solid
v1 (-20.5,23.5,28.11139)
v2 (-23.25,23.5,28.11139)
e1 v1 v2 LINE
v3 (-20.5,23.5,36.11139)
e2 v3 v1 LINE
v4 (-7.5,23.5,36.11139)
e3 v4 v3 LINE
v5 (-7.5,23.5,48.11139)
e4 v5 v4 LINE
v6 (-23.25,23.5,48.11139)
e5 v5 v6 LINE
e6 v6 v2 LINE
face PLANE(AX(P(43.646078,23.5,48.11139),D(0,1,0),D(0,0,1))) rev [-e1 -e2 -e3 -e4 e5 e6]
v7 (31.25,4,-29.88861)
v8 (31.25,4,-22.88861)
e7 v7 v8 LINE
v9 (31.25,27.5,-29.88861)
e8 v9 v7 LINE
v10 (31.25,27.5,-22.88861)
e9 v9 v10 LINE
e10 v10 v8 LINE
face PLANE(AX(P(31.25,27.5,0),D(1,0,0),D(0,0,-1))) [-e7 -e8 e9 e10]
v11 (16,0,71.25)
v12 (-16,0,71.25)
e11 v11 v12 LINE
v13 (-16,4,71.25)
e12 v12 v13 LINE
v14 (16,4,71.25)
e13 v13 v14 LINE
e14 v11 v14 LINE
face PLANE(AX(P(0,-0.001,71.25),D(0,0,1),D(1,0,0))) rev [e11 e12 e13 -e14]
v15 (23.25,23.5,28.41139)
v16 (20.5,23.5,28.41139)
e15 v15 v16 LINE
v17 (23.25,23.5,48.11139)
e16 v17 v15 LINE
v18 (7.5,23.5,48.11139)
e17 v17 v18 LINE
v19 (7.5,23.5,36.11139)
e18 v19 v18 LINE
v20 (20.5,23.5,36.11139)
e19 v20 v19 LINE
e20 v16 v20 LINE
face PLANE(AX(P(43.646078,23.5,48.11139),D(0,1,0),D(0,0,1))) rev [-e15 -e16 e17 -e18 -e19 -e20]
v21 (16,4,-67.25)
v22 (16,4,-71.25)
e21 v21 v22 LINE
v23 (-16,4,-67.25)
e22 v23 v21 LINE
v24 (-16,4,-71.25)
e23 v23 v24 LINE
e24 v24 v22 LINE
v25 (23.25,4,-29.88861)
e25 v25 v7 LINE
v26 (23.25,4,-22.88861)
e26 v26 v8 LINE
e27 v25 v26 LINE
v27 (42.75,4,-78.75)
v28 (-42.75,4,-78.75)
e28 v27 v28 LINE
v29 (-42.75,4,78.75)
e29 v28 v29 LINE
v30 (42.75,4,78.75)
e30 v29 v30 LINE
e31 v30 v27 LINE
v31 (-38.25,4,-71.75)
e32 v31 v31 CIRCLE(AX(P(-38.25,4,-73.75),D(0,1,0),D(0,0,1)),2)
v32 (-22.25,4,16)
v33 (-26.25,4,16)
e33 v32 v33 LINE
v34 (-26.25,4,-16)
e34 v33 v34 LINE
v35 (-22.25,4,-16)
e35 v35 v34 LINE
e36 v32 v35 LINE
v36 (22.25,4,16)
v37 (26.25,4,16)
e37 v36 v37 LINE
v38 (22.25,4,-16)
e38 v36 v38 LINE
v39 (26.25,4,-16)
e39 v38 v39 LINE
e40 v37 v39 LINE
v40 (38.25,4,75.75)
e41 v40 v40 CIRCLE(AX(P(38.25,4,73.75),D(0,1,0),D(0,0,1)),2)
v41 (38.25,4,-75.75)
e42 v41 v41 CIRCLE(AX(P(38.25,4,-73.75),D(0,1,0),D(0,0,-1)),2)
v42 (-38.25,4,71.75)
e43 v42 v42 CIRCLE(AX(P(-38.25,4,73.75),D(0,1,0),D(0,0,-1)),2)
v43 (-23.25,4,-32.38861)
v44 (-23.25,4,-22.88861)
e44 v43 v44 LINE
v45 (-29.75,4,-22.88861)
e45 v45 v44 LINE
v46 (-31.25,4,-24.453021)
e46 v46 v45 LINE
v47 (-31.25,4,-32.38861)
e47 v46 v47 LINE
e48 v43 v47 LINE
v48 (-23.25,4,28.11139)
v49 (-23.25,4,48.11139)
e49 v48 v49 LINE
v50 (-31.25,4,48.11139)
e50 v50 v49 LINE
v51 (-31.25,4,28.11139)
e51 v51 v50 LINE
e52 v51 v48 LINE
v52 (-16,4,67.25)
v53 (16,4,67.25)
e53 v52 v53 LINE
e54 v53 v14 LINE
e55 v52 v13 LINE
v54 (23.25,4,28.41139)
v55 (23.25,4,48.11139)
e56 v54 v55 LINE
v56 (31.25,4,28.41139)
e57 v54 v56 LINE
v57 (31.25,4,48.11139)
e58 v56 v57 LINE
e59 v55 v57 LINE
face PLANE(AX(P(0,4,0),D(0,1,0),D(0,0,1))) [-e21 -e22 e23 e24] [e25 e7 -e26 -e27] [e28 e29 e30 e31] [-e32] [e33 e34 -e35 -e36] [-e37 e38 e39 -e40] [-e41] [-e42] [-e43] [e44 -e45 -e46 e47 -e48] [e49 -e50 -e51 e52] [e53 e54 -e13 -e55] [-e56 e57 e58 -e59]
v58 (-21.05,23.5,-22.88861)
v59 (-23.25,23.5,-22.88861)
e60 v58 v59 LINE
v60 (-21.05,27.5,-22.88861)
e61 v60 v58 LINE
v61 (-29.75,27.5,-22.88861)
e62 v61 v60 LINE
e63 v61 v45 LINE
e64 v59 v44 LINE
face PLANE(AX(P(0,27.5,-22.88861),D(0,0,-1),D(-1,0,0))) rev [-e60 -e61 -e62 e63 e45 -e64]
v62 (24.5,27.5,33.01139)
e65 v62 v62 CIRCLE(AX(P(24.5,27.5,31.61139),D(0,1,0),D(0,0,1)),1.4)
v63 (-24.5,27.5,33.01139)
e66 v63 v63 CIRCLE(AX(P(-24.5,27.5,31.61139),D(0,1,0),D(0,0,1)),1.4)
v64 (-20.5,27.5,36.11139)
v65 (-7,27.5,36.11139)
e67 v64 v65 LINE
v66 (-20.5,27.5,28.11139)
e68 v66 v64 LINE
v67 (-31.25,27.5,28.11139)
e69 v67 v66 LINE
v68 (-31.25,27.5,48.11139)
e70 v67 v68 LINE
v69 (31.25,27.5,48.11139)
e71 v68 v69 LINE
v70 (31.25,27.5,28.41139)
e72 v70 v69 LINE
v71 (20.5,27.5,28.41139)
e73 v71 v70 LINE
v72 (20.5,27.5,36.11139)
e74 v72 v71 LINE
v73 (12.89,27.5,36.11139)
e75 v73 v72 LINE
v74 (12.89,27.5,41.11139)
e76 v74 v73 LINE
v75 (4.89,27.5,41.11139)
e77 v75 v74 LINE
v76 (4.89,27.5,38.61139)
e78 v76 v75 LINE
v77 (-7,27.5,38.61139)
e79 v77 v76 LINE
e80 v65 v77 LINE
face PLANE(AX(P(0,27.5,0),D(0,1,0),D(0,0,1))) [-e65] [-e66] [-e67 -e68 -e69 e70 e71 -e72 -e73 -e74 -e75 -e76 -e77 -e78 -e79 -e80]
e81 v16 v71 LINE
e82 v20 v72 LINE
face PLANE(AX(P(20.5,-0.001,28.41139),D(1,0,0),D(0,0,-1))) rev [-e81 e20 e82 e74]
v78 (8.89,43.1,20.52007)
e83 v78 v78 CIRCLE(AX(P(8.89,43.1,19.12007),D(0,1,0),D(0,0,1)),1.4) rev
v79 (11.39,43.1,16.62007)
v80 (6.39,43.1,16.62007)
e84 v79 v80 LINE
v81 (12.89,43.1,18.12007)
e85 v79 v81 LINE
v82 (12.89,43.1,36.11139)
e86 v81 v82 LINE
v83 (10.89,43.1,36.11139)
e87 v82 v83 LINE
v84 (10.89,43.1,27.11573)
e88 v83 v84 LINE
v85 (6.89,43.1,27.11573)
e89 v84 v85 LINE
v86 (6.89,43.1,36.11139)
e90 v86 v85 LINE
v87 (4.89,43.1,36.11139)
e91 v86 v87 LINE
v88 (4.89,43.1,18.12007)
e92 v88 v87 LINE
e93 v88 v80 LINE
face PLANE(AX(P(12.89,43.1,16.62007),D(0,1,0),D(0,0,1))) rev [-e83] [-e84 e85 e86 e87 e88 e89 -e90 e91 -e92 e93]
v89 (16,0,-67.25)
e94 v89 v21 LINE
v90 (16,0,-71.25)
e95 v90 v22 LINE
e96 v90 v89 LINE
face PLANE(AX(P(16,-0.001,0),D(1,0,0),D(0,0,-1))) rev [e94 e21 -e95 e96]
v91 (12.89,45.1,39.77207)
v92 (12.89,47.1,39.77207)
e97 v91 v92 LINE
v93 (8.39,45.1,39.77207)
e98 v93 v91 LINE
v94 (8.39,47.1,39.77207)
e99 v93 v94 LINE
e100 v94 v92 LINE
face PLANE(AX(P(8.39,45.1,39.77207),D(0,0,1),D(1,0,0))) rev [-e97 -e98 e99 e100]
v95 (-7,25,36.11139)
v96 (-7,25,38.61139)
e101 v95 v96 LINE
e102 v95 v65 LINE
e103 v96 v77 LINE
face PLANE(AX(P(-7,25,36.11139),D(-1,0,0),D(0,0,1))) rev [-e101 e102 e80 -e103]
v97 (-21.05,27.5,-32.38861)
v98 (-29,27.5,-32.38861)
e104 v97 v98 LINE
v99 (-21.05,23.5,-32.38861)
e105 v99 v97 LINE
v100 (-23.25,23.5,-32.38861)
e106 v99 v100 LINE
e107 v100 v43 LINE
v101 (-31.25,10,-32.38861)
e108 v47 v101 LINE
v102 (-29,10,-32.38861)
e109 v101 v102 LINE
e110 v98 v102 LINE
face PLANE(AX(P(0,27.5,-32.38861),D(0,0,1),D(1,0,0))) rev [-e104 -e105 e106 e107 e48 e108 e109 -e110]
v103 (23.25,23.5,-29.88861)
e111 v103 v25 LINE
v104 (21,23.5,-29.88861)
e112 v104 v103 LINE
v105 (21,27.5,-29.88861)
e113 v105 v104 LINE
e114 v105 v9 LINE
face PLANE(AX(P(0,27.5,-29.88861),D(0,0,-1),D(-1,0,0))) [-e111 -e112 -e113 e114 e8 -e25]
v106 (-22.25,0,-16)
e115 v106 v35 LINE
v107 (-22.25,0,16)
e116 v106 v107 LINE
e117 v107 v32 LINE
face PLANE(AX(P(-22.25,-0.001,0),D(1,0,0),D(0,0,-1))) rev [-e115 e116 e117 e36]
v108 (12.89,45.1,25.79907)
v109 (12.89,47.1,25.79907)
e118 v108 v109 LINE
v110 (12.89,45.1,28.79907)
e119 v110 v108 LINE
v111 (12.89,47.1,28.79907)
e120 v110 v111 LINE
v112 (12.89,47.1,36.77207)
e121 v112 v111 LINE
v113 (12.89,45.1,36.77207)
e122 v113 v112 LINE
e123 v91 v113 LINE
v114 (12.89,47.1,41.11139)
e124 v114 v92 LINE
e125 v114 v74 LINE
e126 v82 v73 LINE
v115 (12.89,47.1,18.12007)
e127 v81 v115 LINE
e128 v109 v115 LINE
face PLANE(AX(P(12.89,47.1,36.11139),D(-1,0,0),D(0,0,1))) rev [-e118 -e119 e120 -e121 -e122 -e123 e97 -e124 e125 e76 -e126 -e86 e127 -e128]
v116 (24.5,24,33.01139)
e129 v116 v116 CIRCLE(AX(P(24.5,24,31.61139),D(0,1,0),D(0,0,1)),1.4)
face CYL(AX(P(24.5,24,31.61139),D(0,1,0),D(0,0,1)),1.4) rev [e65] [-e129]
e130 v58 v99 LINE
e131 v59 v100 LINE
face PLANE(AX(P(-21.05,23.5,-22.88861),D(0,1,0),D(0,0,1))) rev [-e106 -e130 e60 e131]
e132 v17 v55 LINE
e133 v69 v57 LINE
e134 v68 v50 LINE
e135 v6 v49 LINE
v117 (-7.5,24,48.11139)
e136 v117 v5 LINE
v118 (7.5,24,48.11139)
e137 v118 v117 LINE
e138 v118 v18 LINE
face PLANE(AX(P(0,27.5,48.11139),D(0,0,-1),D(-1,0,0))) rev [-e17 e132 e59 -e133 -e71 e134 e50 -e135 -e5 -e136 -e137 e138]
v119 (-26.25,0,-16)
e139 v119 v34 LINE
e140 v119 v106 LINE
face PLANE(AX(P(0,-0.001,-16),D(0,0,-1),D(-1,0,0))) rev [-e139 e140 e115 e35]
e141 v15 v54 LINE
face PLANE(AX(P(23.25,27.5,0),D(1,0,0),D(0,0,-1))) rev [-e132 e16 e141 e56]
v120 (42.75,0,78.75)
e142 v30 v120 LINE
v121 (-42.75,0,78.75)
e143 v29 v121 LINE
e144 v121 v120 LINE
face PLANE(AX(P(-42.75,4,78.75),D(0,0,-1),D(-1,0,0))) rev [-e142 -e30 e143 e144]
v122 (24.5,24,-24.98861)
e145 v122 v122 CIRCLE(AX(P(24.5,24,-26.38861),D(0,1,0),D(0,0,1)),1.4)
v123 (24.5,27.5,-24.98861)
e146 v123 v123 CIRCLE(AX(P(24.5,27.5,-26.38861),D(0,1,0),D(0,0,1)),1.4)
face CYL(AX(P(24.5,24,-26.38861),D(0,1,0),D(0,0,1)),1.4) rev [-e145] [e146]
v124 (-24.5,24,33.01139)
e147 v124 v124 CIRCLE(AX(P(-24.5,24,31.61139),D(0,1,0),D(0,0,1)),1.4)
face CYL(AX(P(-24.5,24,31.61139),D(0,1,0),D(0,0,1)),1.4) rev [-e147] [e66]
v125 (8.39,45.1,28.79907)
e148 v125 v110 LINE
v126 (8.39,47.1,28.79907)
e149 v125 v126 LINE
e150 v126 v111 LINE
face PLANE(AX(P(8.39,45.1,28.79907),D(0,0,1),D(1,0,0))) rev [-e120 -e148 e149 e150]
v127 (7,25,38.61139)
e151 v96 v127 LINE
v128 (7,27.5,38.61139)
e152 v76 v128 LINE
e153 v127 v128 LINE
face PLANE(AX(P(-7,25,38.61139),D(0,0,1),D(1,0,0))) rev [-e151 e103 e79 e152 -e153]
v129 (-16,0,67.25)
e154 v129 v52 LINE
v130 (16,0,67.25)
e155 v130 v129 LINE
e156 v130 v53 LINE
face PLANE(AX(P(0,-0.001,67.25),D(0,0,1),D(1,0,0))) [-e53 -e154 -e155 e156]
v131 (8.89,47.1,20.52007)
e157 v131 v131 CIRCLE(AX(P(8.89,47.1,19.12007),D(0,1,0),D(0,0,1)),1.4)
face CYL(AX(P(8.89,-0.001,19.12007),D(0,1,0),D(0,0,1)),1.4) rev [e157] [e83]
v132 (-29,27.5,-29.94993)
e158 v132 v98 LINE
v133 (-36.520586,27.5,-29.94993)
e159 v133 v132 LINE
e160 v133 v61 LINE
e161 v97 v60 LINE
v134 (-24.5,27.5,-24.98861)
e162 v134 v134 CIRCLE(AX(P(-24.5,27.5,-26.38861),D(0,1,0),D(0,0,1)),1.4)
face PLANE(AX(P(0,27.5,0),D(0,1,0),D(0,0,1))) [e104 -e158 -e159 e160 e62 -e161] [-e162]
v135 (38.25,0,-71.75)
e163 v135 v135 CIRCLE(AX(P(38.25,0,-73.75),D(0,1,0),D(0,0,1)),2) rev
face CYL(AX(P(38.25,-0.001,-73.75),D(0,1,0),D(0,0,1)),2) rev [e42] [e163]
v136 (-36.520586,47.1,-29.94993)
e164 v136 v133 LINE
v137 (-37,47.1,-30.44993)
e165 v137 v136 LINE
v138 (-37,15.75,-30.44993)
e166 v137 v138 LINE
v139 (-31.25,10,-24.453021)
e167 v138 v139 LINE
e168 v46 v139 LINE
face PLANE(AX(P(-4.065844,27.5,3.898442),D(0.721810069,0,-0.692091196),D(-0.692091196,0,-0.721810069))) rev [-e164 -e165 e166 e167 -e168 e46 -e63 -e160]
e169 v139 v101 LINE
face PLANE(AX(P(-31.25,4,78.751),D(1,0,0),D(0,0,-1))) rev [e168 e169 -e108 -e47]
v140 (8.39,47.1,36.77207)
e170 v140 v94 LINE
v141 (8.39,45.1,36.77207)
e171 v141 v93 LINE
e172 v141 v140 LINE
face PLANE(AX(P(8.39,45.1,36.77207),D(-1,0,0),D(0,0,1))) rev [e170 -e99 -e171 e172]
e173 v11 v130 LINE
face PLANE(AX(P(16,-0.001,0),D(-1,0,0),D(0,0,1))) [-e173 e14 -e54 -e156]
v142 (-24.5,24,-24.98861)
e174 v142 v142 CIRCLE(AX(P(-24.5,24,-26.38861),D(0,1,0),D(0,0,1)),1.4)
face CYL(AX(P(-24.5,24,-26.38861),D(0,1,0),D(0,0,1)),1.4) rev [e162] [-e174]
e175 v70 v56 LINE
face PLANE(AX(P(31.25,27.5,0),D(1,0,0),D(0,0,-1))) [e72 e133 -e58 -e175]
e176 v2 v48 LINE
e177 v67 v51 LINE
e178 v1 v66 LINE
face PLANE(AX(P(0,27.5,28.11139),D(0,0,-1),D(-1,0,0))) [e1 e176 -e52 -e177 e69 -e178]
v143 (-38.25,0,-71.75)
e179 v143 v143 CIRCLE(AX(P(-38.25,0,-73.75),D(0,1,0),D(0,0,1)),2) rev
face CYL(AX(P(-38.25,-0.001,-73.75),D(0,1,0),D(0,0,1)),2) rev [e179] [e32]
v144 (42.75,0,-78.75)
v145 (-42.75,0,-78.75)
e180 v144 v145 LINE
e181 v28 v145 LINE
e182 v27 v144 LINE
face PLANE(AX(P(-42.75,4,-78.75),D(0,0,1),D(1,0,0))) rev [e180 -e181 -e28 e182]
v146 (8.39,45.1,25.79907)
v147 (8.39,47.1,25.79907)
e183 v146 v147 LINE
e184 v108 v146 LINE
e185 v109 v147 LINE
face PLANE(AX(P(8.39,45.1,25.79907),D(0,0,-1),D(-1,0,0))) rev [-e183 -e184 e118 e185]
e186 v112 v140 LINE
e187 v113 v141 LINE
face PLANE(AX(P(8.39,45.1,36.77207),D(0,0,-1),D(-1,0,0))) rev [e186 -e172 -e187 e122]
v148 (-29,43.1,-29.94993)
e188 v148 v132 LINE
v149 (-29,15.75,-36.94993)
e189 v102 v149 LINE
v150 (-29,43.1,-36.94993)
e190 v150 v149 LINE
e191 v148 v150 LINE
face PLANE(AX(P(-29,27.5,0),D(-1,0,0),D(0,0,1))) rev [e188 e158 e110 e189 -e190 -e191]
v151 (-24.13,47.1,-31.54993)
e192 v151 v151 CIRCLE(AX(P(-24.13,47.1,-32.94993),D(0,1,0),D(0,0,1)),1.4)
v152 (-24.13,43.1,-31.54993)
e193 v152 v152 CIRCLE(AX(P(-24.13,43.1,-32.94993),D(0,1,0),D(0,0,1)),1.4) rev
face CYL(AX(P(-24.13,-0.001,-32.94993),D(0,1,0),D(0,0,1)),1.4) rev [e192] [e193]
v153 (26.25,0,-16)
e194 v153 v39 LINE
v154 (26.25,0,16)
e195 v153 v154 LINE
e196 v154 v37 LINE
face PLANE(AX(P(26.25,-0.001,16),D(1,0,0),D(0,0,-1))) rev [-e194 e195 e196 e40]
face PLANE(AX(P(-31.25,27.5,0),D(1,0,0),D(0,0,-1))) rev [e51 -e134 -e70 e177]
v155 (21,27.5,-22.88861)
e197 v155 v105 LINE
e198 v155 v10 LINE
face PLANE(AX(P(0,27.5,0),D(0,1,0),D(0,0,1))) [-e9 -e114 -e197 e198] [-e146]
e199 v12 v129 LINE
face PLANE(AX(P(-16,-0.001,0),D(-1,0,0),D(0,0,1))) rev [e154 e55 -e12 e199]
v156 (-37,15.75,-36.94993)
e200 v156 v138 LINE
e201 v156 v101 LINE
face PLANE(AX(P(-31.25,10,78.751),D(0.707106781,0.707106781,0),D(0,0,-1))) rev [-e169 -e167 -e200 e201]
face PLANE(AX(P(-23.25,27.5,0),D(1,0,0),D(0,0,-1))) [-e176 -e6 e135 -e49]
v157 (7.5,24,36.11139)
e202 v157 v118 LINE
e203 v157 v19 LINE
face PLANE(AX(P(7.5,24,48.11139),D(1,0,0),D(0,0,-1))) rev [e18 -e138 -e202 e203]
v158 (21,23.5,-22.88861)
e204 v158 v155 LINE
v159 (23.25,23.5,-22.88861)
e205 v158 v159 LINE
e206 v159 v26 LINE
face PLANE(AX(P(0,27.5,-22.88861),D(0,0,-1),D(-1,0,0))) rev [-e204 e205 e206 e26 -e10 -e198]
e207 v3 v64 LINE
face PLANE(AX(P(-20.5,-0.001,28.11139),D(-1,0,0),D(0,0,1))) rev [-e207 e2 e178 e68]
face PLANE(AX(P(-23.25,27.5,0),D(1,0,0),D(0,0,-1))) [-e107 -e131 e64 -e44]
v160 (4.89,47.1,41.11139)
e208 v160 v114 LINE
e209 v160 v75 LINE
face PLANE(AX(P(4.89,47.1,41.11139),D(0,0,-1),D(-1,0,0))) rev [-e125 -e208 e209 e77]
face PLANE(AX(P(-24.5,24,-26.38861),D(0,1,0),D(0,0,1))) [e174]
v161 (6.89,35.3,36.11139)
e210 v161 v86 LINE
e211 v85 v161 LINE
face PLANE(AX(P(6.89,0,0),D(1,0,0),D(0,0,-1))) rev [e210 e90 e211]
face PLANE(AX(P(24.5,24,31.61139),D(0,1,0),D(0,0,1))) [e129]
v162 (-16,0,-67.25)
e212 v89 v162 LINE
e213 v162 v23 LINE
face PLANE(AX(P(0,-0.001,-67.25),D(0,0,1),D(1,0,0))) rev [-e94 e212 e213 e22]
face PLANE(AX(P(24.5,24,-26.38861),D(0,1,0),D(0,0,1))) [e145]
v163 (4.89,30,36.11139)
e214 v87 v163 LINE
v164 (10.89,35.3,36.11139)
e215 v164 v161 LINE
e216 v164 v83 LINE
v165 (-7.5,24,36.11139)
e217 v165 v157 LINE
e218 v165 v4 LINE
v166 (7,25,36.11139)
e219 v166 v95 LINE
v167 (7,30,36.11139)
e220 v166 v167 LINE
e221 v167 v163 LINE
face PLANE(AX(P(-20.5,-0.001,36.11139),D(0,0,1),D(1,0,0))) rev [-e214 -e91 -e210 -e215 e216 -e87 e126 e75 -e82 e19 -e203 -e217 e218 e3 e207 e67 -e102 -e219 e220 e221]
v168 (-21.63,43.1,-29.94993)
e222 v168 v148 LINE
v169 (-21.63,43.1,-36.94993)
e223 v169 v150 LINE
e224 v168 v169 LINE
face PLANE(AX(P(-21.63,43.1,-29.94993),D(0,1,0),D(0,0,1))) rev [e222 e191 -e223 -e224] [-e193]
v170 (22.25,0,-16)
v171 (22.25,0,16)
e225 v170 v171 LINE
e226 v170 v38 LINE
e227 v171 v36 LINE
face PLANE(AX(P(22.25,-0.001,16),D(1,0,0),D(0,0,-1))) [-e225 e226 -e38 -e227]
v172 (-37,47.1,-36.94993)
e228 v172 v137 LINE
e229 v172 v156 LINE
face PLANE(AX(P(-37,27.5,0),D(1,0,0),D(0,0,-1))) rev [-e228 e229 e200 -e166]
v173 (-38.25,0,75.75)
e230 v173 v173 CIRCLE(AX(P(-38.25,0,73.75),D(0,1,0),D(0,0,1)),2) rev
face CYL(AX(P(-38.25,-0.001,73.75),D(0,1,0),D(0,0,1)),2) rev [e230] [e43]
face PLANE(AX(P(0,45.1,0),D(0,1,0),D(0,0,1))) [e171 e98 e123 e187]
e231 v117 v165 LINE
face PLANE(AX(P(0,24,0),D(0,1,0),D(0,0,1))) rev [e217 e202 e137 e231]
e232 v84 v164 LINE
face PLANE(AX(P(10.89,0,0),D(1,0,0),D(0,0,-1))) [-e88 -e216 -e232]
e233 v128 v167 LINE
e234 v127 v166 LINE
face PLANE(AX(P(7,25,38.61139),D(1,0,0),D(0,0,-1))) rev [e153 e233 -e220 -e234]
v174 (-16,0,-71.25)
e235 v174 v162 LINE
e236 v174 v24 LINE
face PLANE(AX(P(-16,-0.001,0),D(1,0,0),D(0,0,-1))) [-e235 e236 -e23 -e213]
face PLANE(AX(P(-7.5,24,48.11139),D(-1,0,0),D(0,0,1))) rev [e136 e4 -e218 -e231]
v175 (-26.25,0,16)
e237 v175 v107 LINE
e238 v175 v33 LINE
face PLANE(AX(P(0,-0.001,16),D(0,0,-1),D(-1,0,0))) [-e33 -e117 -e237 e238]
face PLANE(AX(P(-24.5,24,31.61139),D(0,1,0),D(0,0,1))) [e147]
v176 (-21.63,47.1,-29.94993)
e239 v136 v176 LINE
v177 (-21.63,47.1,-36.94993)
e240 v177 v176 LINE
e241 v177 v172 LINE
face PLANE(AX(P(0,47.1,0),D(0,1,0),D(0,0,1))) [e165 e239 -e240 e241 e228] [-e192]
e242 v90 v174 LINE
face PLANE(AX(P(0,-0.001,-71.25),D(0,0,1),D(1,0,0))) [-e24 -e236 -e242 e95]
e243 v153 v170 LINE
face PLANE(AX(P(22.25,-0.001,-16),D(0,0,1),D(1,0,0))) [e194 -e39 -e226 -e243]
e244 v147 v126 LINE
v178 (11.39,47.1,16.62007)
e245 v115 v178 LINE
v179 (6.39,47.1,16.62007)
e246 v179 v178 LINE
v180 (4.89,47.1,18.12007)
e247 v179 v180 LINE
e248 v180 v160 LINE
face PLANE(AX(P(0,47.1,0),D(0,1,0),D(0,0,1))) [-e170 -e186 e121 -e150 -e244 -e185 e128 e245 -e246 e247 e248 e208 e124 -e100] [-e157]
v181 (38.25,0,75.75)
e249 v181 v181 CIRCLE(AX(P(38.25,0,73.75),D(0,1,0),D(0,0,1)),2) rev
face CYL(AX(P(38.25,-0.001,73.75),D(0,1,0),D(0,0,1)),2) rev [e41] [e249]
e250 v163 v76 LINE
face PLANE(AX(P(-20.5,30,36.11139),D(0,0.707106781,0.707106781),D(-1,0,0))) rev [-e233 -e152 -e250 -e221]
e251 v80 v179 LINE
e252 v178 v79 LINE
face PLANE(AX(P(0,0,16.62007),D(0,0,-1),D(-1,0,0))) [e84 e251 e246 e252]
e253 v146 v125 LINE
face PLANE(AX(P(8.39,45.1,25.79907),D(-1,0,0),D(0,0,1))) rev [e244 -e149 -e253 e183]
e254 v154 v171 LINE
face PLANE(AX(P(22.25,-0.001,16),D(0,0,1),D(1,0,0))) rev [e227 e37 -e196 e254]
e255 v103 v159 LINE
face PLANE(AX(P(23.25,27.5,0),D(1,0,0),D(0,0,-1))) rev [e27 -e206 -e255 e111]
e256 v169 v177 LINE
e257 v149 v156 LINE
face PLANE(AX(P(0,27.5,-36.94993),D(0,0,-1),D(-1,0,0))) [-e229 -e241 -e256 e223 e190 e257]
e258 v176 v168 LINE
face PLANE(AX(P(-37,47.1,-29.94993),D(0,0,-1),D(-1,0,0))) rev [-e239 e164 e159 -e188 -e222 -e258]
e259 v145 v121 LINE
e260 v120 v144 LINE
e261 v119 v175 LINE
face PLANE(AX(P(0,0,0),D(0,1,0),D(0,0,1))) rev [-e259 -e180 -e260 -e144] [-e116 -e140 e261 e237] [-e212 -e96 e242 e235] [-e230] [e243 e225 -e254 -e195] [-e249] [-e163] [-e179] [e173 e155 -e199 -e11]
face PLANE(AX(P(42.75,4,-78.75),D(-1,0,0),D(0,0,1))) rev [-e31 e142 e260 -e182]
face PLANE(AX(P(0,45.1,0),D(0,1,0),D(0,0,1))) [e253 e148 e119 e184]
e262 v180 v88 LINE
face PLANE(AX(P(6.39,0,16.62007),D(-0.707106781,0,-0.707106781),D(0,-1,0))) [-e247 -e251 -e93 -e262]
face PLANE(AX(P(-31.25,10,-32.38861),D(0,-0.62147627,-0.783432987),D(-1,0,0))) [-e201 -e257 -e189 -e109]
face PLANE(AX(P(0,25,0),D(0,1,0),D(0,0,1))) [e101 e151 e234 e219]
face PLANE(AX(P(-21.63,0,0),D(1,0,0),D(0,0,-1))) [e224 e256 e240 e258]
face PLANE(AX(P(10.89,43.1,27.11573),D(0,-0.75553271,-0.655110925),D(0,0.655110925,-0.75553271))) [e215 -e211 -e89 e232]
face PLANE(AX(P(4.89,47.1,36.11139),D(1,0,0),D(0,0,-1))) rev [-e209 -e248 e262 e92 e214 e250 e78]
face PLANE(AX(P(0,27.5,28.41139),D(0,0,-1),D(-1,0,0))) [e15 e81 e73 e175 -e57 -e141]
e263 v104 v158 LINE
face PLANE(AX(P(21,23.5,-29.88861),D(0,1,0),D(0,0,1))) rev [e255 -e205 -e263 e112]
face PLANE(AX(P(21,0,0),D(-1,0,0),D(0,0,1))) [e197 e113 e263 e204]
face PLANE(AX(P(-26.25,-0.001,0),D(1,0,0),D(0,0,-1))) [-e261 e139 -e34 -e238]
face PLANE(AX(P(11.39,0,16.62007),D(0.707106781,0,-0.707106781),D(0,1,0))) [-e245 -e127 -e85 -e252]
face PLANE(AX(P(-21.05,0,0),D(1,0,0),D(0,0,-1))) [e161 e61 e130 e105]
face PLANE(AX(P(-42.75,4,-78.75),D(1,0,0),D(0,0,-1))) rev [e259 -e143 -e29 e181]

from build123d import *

# Parameters (mm, degrees)
SKETCH1_W                 = 85.5
SKETCH1_H                 = 157.5
BOSS_EXTRUDE1_DEPTH       = 4
CUT_EXTRUDE1_REACH        = 91.695
SKETCH2_R                 = 2
CUT_EXTRUDE3_REACH        = 91.695
SKETCH5_W                 = 4
SKETCH5_H                 = 32
SKETCH5_W_2               = 32
SKETCH5_H_2               = 4
SKETCH5_3_W               = 8
SKETCH5_3_H               = 7
SKETCH5_3_H_2             = 20
SKETCH5_3_H_3             = 19.7
BOSS_EXTRUDE3_DEPTH       = 23.5
SKETCH6_W                 = 20
SKETCH6_H                 = 4
BOSS_EXTRUDE5_DEPTH       = 46.5
CUT_EXTRUDE4_REACH        = 95.73
SKETCH8_W                 = 7
SKETCH8_H                 = 4
BOSS_EXTRUDE6_DEPTH       = 2.25
SKETCH9_W                 = 9.5
SKETCH9_H                 = 4
BOSS_EXTRUDE7_DEPTH       = 2.2
CUT_EXTRUDE5_START        = 23.5
SKETCH5_5_R               = 1.4
CUT_EXTRUDE5_DEPTH        = 3.5
SKETCH13_W                = 8
SKETCH13_H                = 7
SKETCH13_H_2              = 5
BOSS_EXTRUDE8_DEPTH       = 19.6
CUT_EXTRUDE11_REACH       = 95.73
SKETCH14_W                = 7
SKETCH14_H                = 4
BOSS_EXTRUDE9_DEPTH       = 7.37
SKETCH15_W                = 8
SKETCH15_H                = 4
BOSS_EXTRUDE10_DEPTH      = 19.49132
CUT_EXTRUDE6_START        = 39.1
SKETCH5_6_R               = 1.4
CUT_EXTRUDE6_DEPTH        = 4
SKETCH16_W                = 4.5
SKETCH16_H                = 3
CUT_EXTRUDE7_DEPTH        = 2
CHAMFER1_SIZE             = 1.5
BOSS_EXTRUDE11_DEPTH      = 2
BOSS_EXTRUDE11_DEPTH_BACK = 2
CUT_EXTRUDE8_REACH        = 134.032
SKETCH20_W                = 5.75
SKETCH20_H                = 6
CHAMFER2_SIZE             = 5.75
SKETCH21_W                = 2.25
SKETCH21_H                = 6
CUT_EXTRUDE9_DEPTH        = 4.56132
CHAMFER3_SIZE             = 5.75
CHAMFER3_SIZE2            = 4.56132
SKETCH22_W                = 14
SKETCH22_H                = 2.5
CUT_EXTRUDE10_DEPTH       = 2.5
CHAMFER4_SIZE             = 2.5
SKETCH24_W                = 15
SKETCH24_H                = 12
CUT_EXTRUDE12_DEPTH       = 0.5


# Some blends are built 0.0001 mm under size
with BuildPart() as part:
    # Sketch1 → Boss-Extrude1 (new body)
    with BuildSketch(Plane(origin=(0, 0, 0), x_dir=(1, 0, 0), z_dir=(0, 1, 0))):
        Rectangle(SKETCH1_W, SKETCH1_H)
    extrude(amount=BOSS_EXTRUDE1_DEPTH)

    # Sketch2 → Cut-Extrude1 (cut, up to next)
    with BuildSketch(Plane(origin=(0, 4, 0), x_dir=(1, 0, 0), z_dir=(0, 1, 0)), mode=Mode.PRIVATE) as cut_extrude1_sk1:
        with Locations(Location((38.25, -73.75, 0), (0, 0, 270))):
            Circle(SKETCH2_R)
    cut_extrude1_tool1 = extrude(cut_extrude1_sk1.sketch, amount=-CUT_EXTRUDE1_REACH, mode=Mode.PRIVATE) & part.part
    # Sketch2 → Cut-Extrude1 (cut, up to next)
    with BuildSketch(Plane(origin=(0, 4, 0), x_dir=(1, 0, 0), z_dir=(0, 1, 0)), mode=Mode.PRIVATE) as cut_extrude1_sk2:
        with Locations(Location((38.25, 73.75, 0), (0, 0, 270))):
            Circle(SKETCH2_R)
    cut_extrude1_tool2 = extrude(cut_extrude1_sk2.sketch, amount=-CUT_EXTRUDE1_REACH, mode=Mode.PRIVATE) & part.part
    # Sketch2 → Cut-Extrude1 (cut, up to next)
    with BuildSketch(Plane(origin=(0, 4, 0), x_dir=(1, 0, 0), z_dir=(0, 1, 0)), mode=Mode.PRIVATE) as cut_extrude1_sk3:
        with Locations(Location((-38.25, -73.75, 0), (0, 0, 270))):
            Circle(SKETCH2_R)
    cut_extrude1_tool3 = extrude(cut_extrude1_sk3.sketch, amount=-CUT_EXTRUDE1_REACH, mode=Mode.PRIVATE) & part.part
    # Sketch2 → Cut-Extrude1 (cut, up to next)
    with BuildSketch(Plane(origin=(0, 4, 0), x_dir=(1, 0, 0), z_dir=(0, 1, 0)), mode=Mode.PRIVATE) as cut_extrude1_sk4:
        with Locations(Location((-38.25, 73.75, 0), (0, 0, 270))):
            Circle(SKETCH2_R)
    cut_extrude1_tool4 = extrude(cut_extrude1_sk4.sketch, amount=-CUT_EXTRUDE1_REACH, mode=Mode.PRIVATE) & part.part
    add(cut_extrude1_tool1.solids().sort_by_distance((38.25, 4, 73.75))[0], mode=Mode.SUBTRACT)
    add(cut_extrude1_tool2.solids().sort_by_distance((38.25, 4, -73.75))[0], mode=Mode.SUBTRACT)
    add(cut_extrude1_tool3.solids().sort_by_distance((-38.25, 4, 73.75))[0], mode=Mode.SUBTRACT)
    add(cut_extrude1_tool4.solids().sort_by_distance((-38.25, 4, -73.75))[0], mode=Mode.SUBTRACT)

    # Sketch5 → Cut-Extrude3 (cut, up to next)
    with BuildSketch(Plane(origin=(0, 4, 0), x_dir=(1, 0, 0), z_dir=(0, 1, 0)), mode=Mode.PRIVATE) as cut_extrude3_sk1:
        with Locations((-24.25, 0)):
            Rectangle(SKETCH5_W, SKETCH5_H)
    cut_extrude3_tool1 = extrude(cut_extrude3_sk1.sketch, amount=-CUT_EXTRUDE3_REACH, mode=Mode.PRIVATE) & part.part
    # Sketch5 → Cut-Extrude3 (cut, up to next)
    with BuildSketch(Plane(origin=(0, 4, 0), x_dir=(1, 0, 0), z_dir=(0, 1, 0)), mode=Mode.PRIVATE) as cut_extrude3_sk2:
        with Locations((0, 69.25)):
            Rectangle(SKETCH5_W_2, SKETCH5_H_2)
    cut_extrude3_tool2 = extrude(cut_extrude3_sk2.sketch, amount=-CUT_EXTRUDE3_REACH, mode=Mode.PRIVATE) & part.part
    # Sketch5 → Cut-Extrude3 (cut, up to next)
    with BuildSketch(Plane(origin=(0, 4, 0), x_dir=(1, 0, 0), z_dir=(0, 1, 0)), mode=Mode.PRIVATE) as cut_extrude3_sk3:
        with Locations((0, -69.25)):
            Rectangle(SKETCH5_W_2, SKETCH5_H_2)
    cut_extrude3_tool3 = extrude(cut_extrude3_sk3.sketch, amount=-CUT_EXTRUDE3_REACH, mode=Mode.PRIVATE) & part.part
    # Sketch5 → Cut-Extrude3 (cut, up to next)
    with BuildSketch(Plane(origin=(0, 4, 0), x_dir=(1, 0, 0), z_dir=(0, 1, 0)), mode=Mode.PRIVATE) as cut_extrude3_sk4:
        with Locations((24.25, 0)):
            Rectangle(SKETCH5_W, SKETCH5_H)
    cut_extrude3_tool4 = extrude(cut_extrude3_sk4.sketch, amount=-CUT_EXTRUDE3_REACH, mode=Mode.PRIVATE) & part.part
    add(cut_extrude3_tool1.solids().sort_by_distance((-24.25, 4, 0))[0], mode=Mode.SUBTRACT)
    add(cut_extrude3_tool2.solids().sort_by_distance((0, 4, -69.25))[0], mode=Mode.SUBTRACT)
    add(cut_extrude3_tool3.solids().sort_by_distance((0, 4, 69.25))[0], mode=Mode.SUBTRACT)
    add(cut_extrude3_tool4.solids().sort_by_distance((24.25, 4, 0))[0], mode=Mode.SUBTRACT)

    # Sketch5<3> → Boss-Extrude3 (add)
    with BuildSketch(Plane(origin=(0, 4, 0), x_dir=(1, 0, 0), z_dir=(0, 1, 0))):
        Polygon((-37, 36.94993), (-29, 36.94993), (-29, 32.38861), (-23.25, 32.38861), (-23.25, 22.88861), (-29.75, 22.88861), (-37, 30.44993), align=None)
        with Locations((27.25, 26.38861)):
            Rectangle(SKETCH5_3_W, SKETCH5_3_H)
        with Locations((-27.25, -38.11139)):
            Rectangle(SKETCH5_3_W, SKETCH5_3_H_2)
        with Locations((27.25, -38.26139)):
            Rectangle(SKETCH5_3_W, SKETCH5_3_H_3)
    extrude(amount=BOSS_EXTRUDE3_DEPTH)

    # Sketch6 → Boss-Extrude5 (add)
    with BuildSketch(Plane(origin=(-23.25, 0, 0), x_dir=(0, 0, -1), z_dir=(1, 0, 0))):
        with Locations((-38.11139, 25.5)):
            Rectangle(SKETCH6_W, SKETCH6_H)
    extrude(amount=BOSS_EXTRUDE5_DEPTH)

    # Sketch7 → Cut-Extrude4 (cut, up to next)
    with BuildSketch(Plane(origin=(0, 27.5, 0), x_dir=(1, 0, 0), z_dir=(0, 1, 0)), mode=Mode.PRIVATE) as cut_extrude4_sk1:
        Polygon((-20.5, -28.11139), (23.25, -28.11139), (23.25, -28.41139), (20.5, -28.41139), (20.5, -36.11139), (-20.5, -36.11139), align=None)
    cut_extrude4_tool1 = extrude(cut_extrude4_sk1.sketch, amount=-CUT_EXTRUDE4_REACH, mode=Mode.PRIVATE) & part.part
    add(cut_extrude4_tool1.solids().sort_by_distance((0.054883, 27.5, 32.101731))[0], mode=Mode.SUBTRACT)

    # Sketch8 → Boss-Extrude6 (add)
    with BuildSketch(Plane.ZY.offset(-23.25)):
        with Locations((-26.38861, 25.5)):
            Rectangle(SKETCH8_W, SKETCH8_H)
    extrude(amount=BOSS_EXTRUDE6_DEPTH)

    # Sketch9 → Boss-Extrude7 (add)
    with BuildSketch(Plane(origin=(-23.25, 0, 0), x_dir=(0, 0, -1), z_dir=(1, 0, 0))):
        with Locations((27.63861, 25.5)):
            Rectangle(SKETCH9_W, SKETCH9_H)
    extrude(amount=BOSS_EXTRUDE7_DEPTH)

    # Sketch5<5> → Cut-Extrude5 (cut)
    with BuildSketch(Plane(origin=(0, 4, 0), x_dir=(1, 0, 0), z_dir=(0, 1, 0)).offset(CUT_EXTRUDE5_START)):
        with Locations(Location((-24.5, 26.38861, 0), (0, 0, 270))):
            Circle(SKETCH5_5_R)
        with Locations(Location((24.5, -31.61139, 0), (0, 0, 270))):
            Circle(SKETCH5_5_R)
        with Locations(Location((24.5, 26.38861, 0), (0, 0, 270))):
            Circle(SKETCH5_5_R)
        with Locations(Location((-24.5, -31.61139, 0), (0, 0, 270))):
            Circle(SKETCH5_5_R)
    extrude(amount=-CUT_EXTRUDE5_DEPTH, mode=Mode.SUBTRACT)

    # Sketch13 → Boss-Extrude8 (add)
    with BuildSketch(Plane(origin=(0, 27.5, 0), x_dir=(1, 0, 0), z_dir=(0, 1, 0))):
        with Locations((-33, 33.44993)):
            Rectangle(SKETCH13_W, SKETCH13_H)
        with Locations((8.89, -38.61139)):
            Rectangle(SKETCH13_W, SKETCH13_H_2)
    extrude(amount=BOSS_EXTRUDE8_DEPTH)

    # Sketch23 → Cut-Extrude11 (cut, up to next)
    with BuildSketch(Plane.XZ.offset(-27.5), mode=Mode.PRIVATE) as cut_extrude11_sk1:
        Polygon((-37, -29.94993), (-37, -30.44993), (-36.520586353, -29.94993), align=None)
    cut_extrude11_tool1 = extrude(cut_extrude11_sk1.sketch, amount=-CUT_EXTRUDE11_REACH, mode=Mode.PRIVATE) & part.part
    add(cut_extrude11_tool1.solids().sort_by_distance((-36.840195, 27.5, -30.116597))[0], mode=Mode.SUBTRACT)

    # Sketch14 → Boss-Extrude9 (add)
    with BuildSketch(Plane(origin=(-29, 0, 0), x_dir=(0, 0, -1), z_dir=(1, 0, 0))):
        with Locations((33.44993, 45.1)):
            Rectangle(SKETCH14_W, SKETCH14_H)
    extrude(amount=BOSS_EXTRUDE9_DEPTH)

    # Sketch15 → Boss-Extrude10 (add)
    with BuildSketch(Plane(origin=(0, 0, 36.11139), x_dir=(-1, 0, 0), z_dir=(0, 0, -1))):
        with Locations((-8.89, 45.1)):
            Rectangle(SKETCH15_W, SKETCH15_H)
    extrude(amount=BOSS_EXTRUDE10_DEPTH)

    # Sketch5<6> → Cut-Extrude6 (cut)
    with BuildSketch(Plane(origin=(0, 4, 0), x_dir=(1, 0, 0), z_dir=(0, 1, 0)).offset(CUT_EXTRUDE6_START)):
        with Locations(Location((-24.13, 32.94993, 0), (0, 0, 270))):
            Circle(SKETCH5_6_R)
        with Locations(Location((8.89, -19.12007, 0), (0, 0, 270))):
            Circle(SKETCH5_6_R)
    extrude(amount=CUT_EXTRUDE6_DEPTH, mode=Mode.SUBTRACT)

    # Sketch16 → Cut-Extrude7 (cut)
    with BuildSketch(Plane(origin=(0, 47.1, 0), x_dir=(1, 0, 0), z_dir=(0, 1, 0))):
        with Locations((10.64, -27.29907)):
            Rectangle(SKETCH16_W, SKETCH16_H)
        with Locations((10.64, -38.27207)):
            Rectangle(SKETCH16_W, SKETCH16_H)
    extrude(amount=-CUT_EXTRUDE7_DEPTH, mode=Mode.SUBTRACT)

    # Chamfer1
    chamfer1_edges = [part.edges().sort_by_distance(p)[0] for p in [
        (12.89, 45.1, 16.62007),
        (4.89, 45.1, 16.62007),
    ]]
    chamfer(chamfer1_edges, length=CHAMFER1_SIZE)

    # Sketch19 → Boss-Extrude11 (add, two sides: drawn at the far end of the back side and taken through both)
    with BuildSketch(Plane.ZY.offset(-8.89).offset(-BOSS_EXTRUDE11_DEPTH_BACK)):
        Polygon((27.11573, 43.1), (36.11139, 35.3), (36.11139, 43.1), align=None)
    extrude(amount=BOSS_EXTRUDE11_DEPTH + BOSS_EXTRUDE11_DEPTH_BACK)

    # Cut-Extrude8: up to this plane
    cut_extrude8_end = Plane(origin=(-4.065843585, 27.5, 3.898441805), z_dir=(0.7218100693808475, 0, -0.6920911961153792))
    # Sketch20 → Cut-Extrude8 (cut, up to the surface)
    with BuildSketch(Plane(origin=(0, 0, -36.94993), x_dir=(-1, 0, 0), z_dir=(0, 0, -1)), mode=Mode.PRIVATE) as cut_extrude8_sk1:
        with Locations((34.125, 7)):
            Rectangle(SKETCH20_W, SKETCH20_H)
    cut_extrude8_tool1 = split(extrude(cut_extrude8_sk1.sketch, amount=-CUT_EXTRUDE8_REACH, mode=Mode.PRIVATE), bisect_by=cut_extrude8_end, keep=Keep.BOTH, mode=Mode.PRIVATE)
    add(cut_extrude8_tool1.solids().sort_by_distance((-34.125, 7, -36.94993))[0], mode=Mode.SUBTRACT)

    # Chamfer2
    chamfer2_edges = [part.edges().sort_by_distance(p)[0] for p in [
        (-37, 10, -33.69993),
    ]]
    chamfer(chamfer2_edges, length=CHAMFER2_SIZE - 0.0001)  # a hair under: the kernel refuses the full size

    # Sketch21 → Cut-Extrude9 (cut)
    with BuildSketch(Plane(origin=(0, 0, -36.94993), x_dir=(-1, 0, 0), z_dir=(0, 0, -1))):
        with Locations((30.125, 7)):
            Rectangle(SKETCH21_W, SKETCH21_H)
    extrude(amount=-CUT_EXTRUDE9_DEPTH, mode=Mode.SUBTRACT)

    # Chamfer3
    chamfer3_edges = [part.edges().sort_by_distance(p)[0] for p in [
        (-30.125, 10, -36.94993),
    ]]
    chamfer3_side = [part.faces().sort_by_distance(p)[0] for p in [
        (-32.15740492, 31.012813369, -36.94993),
    ]]
    chamfer(chamfer3_edges, length=CHAMFER3_SIZE, length2=CHAMFER3_SIZE2, reference=chamfer3_side[0])

    # Sketch22 → Cut-Extrude10 (cut)
    with BuildSketch(Plane(origin=(0, 27.5, 0), x_dir=(1, 0, 0), z_dir=(0, 1, 0))):
        with Locations((0, -37.36139)):
            Rectangle(SKETCH22_W, SKETCH22_H)
    extrude(amount=-CUT_EXTRUDE10_DEPTH, mode=Mode.SUBTRACT)

    # Chamfer4
    # the kernel refuses this chamfer: 2.5 mm, written as the material it takes off along each edge
    with BuildSketch(Plane(origin=(4.89, 27.5, 45.04059747), x_dir=(0, 1, 0), z_dir=(0, 0, -1))) as chamfer4_piece_1_section:
        Polygon((CHAMFER4_SIZE, 0), (0, CHAMFER4_SIZE), (0, 0), align=None)
    chamfer4_piece_1 = extrude(amount=15.35841494, mode=Mode.PRIVATE)
    chamfer4_piece_1 = split(chamfer4_piece_1, bisect_by=Plane(origin=(7, 27.5, 45.04059747), z_dir=(-1, 0, 0)), keep=Keep.TOP, mode=Mode.PRIVATE)
    chamfer4_piece_1 = split(chamfer4_piece_1, bisect_by=Plane(origin=(4.89, 24.285396265, 41.825993735), z_dir=(0, -0.7071067811865476, -0.7071067811865476)), keep=Keep.TOP, mode=Mode.PRIVATE)
    add(chamfer4_piece_1, mode=Mode.SUBTRACT)
    with BuildSketch(Plane(origin=(7, 27.5, 36.11139), x_dir=(0, 1, 0), z_dir=(-1, 0, 0))) as chamfer4_piece_2:
        Polygon((CHAMFER4_SIZE, 0), (0, -CHAMFER4_SIZE), (0, 0), align=None)
    extrude(amount=8.53920747, mode=Mode.SUBTRACT)

    # Sketch24 → Cut-Extrude12 (cut)
    with BuildSketch(Plane.XZ.offset(-23.5)):
        with Locations((0, 42.11139)):
            Rectangle(SKETCH24_W, SKETCH24_H)
    extrude(amount=-CUT_EXTRUDE12_DEPTH, mode=Mode.SUBTRACT)


solid = part.part
